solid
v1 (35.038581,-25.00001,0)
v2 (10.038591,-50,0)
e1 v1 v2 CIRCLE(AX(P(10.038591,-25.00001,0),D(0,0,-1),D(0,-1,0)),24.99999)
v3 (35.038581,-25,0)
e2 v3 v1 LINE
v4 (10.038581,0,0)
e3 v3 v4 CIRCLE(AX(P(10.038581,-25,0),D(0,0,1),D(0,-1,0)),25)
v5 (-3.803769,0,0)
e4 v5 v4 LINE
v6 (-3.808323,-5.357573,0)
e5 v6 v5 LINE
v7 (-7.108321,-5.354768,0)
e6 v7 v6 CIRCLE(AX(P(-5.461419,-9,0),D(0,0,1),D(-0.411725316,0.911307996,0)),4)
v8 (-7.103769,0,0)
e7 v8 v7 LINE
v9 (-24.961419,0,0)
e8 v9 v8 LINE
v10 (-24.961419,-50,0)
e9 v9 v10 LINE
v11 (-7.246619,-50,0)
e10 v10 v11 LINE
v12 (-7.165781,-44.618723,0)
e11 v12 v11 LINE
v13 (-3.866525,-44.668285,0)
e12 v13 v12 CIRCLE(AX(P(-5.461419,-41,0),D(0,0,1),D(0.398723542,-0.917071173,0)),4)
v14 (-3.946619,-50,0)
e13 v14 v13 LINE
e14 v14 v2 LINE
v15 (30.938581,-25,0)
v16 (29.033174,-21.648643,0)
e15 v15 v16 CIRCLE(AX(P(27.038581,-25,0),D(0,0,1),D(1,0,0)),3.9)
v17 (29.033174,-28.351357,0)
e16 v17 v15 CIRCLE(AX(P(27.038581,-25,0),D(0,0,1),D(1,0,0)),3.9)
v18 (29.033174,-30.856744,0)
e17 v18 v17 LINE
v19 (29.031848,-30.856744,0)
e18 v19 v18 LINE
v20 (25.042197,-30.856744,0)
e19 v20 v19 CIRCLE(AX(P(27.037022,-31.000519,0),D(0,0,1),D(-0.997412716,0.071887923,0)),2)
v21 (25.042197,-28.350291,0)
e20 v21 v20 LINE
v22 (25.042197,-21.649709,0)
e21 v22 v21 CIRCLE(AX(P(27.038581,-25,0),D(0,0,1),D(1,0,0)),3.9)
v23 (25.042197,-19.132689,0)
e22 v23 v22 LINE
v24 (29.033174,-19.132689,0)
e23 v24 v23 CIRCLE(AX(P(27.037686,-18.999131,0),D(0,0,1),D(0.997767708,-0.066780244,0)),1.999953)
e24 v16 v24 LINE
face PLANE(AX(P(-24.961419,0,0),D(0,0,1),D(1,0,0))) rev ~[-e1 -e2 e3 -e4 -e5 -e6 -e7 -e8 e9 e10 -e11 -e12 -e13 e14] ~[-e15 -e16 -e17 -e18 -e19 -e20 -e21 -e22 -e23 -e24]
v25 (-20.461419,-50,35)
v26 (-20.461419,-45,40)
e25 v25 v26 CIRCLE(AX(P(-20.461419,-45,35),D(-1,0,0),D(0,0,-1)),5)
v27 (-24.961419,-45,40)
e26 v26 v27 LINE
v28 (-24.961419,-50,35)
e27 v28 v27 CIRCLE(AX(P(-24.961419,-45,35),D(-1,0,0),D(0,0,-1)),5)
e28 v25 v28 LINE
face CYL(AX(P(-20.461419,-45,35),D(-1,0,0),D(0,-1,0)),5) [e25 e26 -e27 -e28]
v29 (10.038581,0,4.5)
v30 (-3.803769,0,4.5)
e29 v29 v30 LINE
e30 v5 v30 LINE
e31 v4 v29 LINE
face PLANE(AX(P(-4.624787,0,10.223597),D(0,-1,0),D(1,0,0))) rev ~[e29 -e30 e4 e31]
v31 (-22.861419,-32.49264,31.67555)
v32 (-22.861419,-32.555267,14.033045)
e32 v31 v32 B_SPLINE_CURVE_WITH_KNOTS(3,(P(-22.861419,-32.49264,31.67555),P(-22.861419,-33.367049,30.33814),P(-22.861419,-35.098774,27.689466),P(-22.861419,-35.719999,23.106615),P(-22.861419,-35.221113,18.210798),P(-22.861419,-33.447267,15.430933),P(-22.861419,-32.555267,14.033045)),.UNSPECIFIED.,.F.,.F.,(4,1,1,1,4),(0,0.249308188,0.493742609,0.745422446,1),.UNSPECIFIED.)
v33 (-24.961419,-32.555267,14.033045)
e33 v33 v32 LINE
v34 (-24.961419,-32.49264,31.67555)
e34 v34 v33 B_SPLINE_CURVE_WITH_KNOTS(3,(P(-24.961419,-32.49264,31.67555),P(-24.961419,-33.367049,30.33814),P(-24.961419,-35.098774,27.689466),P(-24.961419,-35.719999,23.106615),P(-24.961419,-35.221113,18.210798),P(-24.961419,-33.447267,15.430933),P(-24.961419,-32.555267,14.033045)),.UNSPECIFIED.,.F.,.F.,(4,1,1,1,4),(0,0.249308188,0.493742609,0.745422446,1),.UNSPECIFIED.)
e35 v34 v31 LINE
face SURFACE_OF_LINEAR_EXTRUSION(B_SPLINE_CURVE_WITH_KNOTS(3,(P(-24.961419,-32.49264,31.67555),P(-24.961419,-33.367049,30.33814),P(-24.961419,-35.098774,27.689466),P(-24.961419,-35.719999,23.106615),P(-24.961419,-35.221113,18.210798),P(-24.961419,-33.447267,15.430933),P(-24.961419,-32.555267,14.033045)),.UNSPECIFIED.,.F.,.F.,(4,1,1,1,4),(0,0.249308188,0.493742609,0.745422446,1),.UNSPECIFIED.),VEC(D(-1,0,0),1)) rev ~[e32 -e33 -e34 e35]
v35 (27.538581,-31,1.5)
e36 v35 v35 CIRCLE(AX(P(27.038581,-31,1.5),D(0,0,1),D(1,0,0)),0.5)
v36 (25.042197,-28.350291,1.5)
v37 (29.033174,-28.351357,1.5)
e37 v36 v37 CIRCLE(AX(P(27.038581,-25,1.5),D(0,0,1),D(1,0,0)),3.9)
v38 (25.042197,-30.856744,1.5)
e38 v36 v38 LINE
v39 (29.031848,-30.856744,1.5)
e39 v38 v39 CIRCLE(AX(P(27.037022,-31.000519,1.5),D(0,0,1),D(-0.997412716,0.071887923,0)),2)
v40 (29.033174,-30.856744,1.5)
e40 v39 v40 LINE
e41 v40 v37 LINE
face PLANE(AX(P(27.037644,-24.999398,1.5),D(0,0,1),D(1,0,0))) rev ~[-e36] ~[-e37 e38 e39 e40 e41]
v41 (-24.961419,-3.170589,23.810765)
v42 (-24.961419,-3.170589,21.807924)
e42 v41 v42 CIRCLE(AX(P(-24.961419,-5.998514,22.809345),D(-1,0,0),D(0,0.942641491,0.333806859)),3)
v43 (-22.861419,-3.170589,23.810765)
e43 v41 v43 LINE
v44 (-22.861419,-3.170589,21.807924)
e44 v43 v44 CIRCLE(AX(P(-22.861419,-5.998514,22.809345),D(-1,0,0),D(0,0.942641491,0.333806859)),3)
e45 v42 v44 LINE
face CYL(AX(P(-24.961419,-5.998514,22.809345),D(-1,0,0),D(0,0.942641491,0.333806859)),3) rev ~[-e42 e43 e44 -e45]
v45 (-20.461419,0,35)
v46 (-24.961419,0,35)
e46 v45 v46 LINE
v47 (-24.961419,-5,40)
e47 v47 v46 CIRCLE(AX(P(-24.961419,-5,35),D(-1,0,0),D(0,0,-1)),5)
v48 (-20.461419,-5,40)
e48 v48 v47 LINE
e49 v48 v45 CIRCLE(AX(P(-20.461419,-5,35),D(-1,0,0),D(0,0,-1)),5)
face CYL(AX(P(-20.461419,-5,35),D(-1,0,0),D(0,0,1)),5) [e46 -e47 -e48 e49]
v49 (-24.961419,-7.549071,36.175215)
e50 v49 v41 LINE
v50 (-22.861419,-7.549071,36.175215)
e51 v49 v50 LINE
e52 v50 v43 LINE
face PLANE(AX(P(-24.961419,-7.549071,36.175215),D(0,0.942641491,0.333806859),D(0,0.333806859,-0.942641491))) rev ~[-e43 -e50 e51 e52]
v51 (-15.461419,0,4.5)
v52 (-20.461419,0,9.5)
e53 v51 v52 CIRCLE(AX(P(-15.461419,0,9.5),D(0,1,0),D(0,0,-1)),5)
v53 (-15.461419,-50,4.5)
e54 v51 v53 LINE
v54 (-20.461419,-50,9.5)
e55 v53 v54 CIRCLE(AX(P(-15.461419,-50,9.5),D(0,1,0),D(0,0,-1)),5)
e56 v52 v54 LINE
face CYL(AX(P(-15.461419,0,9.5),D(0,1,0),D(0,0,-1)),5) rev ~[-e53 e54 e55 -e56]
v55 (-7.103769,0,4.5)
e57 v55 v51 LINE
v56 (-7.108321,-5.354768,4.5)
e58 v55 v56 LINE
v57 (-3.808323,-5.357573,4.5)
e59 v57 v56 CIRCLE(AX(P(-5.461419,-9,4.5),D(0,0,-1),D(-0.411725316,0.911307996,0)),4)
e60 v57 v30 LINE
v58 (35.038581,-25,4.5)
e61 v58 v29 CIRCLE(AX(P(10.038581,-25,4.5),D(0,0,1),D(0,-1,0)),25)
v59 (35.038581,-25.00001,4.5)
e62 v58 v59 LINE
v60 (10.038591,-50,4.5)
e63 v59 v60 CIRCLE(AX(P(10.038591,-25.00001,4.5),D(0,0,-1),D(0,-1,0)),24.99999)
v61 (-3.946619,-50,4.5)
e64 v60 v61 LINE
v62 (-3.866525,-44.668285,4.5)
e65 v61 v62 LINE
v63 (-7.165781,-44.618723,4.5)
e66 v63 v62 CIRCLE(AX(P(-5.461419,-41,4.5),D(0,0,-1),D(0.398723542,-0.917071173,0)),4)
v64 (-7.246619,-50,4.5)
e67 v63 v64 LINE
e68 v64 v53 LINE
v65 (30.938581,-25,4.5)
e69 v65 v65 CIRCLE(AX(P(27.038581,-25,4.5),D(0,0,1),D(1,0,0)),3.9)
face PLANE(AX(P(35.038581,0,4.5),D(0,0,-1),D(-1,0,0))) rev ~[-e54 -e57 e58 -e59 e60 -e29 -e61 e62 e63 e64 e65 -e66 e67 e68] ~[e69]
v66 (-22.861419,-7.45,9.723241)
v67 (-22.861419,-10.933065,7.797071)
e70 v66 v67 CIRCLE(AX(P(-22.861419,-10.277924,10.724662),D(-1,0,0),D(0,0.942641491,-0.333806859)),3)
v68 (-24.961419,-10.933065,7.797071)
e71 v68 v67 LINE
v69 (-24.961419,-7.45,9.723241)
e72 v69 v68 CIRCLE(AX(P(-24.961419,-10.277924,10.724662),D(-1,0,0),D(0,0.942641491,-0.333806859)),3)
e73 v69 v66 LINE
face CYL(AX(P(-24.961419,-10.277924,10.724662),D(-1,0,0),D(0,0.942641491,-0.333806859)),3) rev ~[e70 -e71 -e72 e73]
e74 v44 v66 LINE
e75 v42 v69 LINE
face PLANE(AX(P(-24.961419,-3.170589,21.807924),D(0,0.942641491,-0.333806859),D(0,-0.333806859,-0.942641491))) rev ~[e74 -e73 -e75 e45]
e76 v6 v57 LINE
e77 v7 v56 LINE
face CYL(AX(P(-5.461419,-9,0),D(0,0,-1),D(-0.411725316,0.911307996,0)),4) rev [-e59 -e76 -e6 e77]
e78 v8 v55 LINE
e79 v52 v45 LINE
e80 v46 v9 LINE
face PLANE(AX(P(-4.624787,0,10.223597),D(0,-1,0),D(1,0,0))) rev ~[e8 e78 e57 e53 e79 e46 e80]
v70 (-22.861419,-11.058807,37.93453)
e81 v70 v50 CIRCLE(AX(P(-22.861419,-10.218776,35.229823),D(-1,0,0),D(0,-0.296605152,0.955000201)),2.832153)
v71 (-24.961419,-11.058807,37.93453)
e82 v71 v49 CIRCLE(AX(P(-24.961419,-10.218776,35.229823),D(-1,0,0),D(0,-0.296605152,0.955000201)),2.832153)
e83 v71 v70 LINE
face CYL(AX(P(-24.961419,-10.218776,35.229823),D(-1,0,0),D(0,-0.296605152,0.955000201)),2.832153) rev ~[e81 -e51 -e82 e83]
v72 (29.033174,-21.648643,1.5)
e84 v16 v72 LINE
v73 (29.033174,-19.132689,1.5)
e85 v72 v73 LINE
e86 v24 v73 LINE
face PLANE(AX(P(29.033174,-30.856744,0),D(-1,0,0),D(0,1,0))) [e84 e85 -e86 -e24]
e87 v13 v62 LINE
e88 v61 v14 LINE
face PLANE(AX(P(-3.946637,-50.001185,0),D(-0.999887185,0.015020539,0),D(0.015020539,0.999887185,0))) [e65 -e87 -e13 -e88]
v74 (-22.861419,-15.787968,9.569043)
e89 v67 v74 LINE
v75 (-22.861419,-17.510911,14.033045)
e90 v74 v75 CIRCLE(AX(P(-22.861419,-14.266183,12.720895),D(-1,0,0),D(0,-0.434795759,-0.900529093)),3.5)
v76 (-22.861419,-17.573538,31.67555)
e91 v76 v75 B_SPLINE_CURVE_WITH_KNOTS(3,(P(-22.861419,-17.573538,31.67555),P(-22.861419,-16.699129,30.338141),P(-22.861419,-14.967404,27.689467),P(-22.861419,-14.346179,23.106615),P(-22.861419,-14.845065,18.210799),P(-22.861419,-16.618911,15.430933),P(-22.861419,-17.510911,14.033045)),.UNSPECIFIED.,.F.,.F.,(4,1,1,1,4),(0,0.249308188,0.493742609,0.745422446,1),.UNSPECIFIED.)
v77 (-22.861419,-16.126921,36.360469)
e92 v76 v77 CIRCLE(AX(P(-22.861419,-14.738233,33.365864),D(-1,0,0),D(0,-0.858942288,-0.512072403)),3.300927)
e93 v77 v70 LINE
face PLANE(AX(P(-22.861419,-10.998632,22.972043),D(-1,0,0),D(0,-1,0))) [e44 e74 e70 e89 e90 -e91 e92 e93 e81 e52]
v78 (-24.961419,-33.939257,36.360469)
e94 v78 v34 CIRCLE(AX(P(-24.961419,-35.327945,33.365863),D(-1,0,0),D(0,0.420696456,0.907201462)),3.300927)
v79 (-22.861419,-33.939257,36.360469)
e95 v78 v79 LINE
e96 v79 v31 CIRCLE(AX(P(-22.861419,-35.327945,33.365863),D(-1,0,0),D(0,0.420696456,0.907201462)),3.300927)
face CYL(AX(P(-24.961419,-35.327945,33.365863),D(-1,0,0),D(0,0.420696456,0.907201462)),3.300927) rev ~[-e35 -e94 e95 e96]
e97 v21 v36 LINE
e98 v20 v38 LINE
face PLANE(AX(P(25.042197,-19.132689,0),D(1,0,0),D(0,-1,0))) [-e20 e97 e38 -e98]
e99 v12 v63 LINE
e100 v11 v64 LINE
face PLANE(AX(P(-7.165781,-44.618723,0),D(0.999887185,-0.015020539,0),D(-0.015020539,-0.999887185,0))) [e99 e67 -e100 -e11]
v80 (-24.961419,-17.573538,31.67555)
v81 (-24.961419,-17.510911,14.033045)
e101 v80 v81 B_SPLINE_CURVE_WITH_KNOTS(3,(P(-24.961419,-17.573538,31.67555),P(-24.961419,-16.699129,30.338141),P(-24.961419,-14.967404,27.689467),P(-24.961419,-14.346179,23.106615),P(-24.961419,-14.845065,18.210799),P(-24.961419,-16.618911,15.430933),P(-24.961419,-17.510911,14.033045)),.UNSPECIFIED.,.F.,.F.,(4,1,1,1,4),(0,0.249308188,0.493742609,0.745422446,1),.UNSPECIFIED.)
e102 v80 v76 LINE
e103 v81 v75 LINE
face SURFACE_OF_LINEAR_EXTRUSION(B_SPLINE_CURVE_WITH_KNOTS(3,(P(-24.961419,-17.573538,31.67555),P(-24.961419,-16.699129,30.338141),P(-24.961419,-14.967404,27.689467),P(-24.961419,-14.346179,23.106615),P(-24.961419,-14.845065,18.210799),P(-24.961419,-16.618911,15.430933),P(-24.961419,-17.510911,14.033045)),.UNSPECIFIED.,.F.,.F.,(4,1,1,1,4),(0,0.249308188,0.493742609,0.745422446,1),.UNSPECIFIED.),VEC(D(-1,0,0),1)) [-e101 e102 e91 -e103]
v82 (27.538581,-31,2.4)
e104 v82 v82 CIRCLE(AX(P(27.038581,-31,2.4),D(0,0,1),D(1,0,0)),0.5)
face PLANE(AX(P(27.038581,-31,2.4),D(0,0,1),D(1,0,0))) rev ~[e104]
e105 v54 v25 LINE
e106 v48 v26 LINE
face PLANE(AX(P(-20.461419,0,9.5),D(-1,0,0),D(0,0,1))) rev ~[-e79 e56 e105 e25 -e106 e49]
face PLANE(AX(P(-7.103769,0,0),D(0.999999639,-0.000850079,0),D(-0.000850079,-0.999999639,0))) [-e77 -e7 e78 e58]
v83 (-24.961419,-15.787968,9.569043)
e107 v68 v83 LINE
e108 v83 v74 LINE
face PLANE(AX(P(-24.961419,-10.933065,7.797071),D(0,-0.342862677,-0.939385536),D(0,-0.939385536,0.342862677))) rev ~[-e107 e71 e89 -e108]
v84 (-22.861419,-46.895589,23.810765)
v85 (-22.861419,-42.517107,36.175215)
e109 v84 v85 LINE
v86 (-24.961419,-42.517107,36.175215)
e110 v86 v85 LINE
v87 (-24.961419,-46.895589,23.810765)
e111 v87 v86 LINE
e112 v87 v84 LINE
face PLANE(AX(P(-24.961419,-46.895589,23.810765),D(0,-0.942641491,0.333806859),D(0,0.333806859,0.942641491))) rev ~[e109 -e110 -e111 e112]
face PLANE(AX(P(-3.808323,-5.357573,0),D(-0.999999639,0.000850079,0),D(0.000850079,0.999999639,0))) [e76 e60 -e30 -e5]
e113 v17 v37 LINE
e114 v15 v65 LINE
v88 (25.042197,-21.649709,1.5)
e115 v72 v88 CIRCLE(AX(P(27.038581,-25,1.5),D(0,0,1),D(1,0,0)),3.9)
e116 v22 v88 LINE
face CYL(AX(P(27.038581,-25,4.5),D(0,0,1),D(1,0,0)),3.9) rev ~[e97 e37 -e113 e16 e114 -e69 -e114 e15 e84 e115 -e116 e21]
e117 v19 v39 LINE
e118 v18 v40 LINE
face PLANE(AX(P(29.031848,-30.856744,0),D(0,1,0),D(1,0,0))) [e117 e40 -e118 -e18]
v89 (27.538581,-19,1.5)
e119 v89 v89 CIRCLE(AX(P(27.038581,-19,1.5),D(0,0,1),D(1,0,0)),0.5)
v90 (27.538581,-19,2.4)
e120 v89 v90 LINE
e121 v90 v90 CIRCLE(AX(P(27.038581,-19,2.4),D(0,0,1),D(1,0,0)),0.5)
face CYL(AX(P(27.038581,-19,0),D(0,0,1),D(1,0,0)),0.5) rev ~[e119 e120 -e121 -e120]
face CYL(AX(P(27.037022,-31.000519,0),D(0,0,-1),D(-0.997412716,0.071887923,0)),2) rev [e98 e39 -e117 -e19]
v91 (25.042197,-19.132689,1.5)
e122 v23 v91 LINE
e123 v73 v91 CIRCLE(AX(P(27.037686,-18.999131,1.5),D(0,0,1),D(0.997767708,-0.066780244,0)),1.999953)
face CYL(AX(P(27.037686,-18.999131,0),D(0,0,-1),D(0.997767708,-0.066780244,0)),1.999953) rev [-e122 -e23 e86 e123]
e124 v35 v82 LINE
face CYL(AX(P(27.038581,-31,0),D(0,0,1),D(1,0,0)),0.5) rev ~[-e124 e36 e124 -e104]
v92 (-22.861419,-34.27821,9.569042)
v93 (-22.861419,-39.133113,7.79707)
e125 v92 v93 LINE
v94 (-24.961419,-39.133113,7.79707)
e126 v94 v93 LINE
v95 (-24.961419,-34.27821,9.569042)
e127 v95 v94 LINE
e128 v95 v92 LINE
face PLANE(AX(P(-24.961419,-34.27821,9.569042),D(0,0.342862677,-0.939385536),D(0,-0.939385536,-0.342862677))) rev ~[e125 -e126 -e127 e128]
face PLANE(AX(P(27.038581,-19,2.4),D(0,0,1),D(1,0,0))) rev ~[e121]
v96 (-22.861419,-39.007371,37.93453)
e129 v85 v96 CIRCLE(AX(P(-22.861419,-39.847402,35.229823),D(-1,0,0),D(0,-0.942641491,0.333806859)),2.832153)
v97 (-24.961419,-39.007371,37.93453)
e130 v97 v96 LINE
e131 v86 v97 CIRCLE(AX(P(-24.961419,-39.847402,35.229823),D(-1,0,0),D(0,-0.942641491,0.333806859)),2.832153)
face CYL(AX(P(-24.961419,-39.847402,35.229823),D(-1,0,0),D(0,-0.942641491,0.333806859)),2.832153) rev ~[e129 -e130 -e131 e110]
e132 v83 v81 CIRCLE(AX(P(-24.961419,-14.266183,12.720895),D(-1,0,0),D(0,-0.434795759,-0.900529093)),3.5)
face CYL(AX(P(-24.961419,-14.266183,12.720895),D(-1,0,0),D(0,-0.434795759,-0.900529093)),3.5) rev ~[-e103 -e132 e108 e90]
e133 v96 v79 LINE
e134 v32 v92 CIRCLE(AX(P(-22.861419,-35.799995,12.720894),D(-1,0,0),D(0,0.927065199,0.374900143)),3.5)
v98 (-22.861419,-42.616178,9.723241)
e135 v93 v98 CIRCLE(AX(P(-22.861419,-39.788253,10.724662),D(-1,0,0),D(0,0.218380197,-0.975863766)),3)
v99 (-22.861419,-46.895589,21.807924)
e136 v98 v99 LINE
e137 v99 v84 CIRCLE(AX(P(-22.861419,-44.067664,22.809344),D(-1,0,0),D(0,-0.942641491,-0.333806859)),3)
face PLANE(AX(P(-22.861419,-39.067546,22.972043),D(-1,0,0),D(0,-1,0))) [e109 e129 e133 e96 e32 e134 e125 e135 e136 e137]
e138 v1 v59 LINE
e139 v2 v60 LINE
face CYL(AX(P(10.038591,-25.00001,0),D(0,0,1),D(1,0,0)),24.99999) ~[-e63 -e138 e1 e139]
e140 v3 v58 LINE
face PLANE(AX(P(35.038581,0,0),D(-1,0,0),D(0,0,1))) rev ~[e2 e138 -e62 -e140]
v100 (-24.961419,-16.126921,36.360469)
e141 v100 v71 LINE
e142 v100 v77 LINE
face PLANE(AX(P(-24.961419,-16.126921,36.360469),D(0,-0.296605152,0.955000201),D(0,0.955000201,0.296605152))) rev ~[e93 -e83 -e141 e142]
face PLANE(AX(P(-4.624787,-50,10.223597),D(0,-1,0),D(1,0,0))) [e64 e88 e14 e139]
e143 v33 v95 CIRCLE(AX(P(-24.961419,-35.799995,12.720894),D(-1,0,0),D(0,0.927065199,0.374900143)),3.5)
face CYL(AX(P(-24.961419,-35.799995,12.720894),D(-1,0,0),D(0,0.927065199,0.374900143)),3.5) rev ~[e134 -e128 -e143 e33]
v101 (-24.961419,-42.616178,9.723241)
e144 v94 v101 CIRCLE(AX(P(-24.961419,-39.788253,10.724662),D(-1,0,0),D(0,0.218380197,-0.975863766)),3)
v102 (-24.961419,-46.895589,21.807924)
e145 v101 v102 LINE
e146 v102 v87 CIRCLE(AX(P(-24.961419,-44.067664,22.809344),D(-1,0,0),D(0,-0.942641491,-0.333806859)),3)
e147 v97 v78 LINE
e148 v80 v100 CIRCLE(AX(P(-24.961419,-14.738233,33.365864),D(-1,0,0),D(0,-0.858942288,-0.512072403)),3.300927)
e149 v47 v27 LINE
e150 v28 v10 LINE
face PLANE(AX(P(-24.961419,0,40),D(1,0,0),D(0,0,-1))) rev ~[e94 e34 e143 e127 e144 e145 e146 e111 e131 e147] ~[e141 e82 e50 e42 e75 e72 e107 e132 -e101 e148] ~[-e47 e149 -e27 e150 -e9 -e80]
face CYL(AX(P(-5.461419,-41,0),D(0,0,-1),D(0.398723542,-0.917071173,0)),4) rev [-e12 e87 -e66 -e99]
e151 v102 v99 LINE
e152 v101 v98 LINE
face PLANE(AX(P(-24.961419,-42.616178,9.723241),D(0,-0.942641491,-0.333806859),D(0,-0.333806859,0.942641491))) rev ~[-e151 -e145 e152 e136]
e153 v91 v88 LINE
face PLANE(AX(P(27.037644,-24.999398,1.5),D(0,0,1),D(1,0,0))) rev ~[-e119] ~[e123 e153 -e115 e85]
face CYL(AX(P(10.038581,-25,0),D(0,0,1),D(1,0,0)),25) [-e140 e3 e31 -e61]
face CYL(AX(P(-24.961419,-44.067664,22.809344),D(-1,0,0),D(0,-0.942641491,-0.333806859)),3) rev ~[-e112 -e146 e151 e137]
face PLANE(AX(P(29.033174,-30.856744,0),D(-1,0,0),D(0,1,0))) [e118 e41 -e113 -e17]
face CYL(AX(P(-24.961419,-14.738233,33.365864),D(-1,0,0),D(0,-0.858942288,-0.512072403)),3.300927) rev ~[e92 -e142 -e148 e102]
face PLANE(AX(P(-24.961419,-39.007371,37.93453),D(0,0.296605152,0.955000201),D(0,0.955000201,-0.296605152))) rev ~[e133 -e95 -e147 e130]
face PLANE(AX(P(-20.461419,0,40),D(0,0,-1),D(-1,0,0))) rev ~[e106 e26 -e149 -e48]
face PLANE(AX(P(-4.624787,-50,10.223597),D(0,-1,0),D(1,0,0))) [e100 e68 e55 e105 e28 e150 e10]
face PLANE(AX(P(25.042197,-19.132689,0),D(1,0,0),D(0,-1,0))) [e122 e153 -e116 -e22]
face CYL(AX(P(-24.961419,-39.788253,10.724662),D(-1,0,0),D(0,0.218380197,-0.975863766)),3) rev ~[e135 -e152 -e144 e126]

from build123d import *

# Parameters (mm, degrees)
F1_DEPTH  = 50
F2_R      = 25
F3_R      = 24.99999
F4_R      = 3.9
F5_DEPTH  = 12.5
F7_R      = 0.5
F8_DEPTH  = 2.4
F6_R      = 0.5
F9_DEPTH  = 2.4
F11_DEPTH = 1.5
F12_R     = 5
F13_R     = 5
F15_DEPTH = 2.1
F17_DEPTH = 25
F18_DEPTH = 25


# Not quite as in the source:
# - a fillet or chamfer is up to 0.001 mm smaller than in the source, because OpenCascade refuses the exact size
# - ends of sketch curves that miss each other by under 0.0002 mm in the source are joined


with BuildPart() as f1:
    # F0 (on Front) → F1 (new body)
    with BuildSketch(Plane.XZ):
        with BuildLine():
            Line((-24.9614193552, 0), (35.0385806448, 0))
            Line((35.0385806448, 0), (35.0385806448, 4.5))
            Line((35.0385806448, 4.5), (-15.4614193552, 4.5))
            ThreePointArc((-15.4614193552, 4.5), (-18.9969532612, 5.9644660941), (-20.4614193552, 9.5))
            Line((-20.4614193552, 9.5), (-20.4614193552, 40))
            Line((-20.4614193552, 40), (-24.9614193552, 40))
            Line((-24.9614193552, 40), (-24.9614193552, 0))
        make_face()
    extrude(amount=F1_DEPTH)

    # F2
    f2_edges = [f1.edges().sort_by_distance(p)[0] for p in [
        (35.038581, 0, 2.25),
    ]]
    fillet(f2_edges, radius=F2_R)

    # F3 (radius 25 in the source; OpenCascade refuses exactly that, so slightly less here)
    f3_edges = [f1.edges().sort_by_distance(p)[0] for p in [
        (35.038581, -50, 2.25),
    ]]
    fillet(f3_edges, radius=F3_R)

    # F4 (on face) → F5 (cut, symmetric)
    with BuildSketch(Plane.XY.offset(4.5)):
        with Locations((27.0385806448, -25)):
            Circle(F4_R)
    extrude(amount=F5_DEPTH, both=True, mode=Mode.SUBTRACT)

    # F7 (on Top) → F8 (cut, symmetric)
    with BuildSketch(Plane.XY):
        with Locations((27.0385806448, -19)):
            Circle(F7_R)
    extrude(amount=F8_DEPTH, both=True, mode=Mode.SUBTRACT)

    # F6 (on Top) → F9 (cut, symmetric)
    with BuildSketch(Plane.XY):
        with Locations((27.0385806448, -31)):
            Circle(F6_R)
    extrude(amount=F9_DEPTH, both=True, mode=Mode.SUBTRACT)

    # F10 (on Top) → F11 (cut)
    with BuildSketch(Plane.XY):
        with BuildLine():
            Line((25.0421970529, -19.1326886576), (25.0421970529, -30.8567436225))
            ThreePointArc((25.0421970529, -30.8567436225), (27.0370224854, -33.0005194676), (29.031847918, -30.8567436225))
            Line((29.031847918, -30.8567436225), (29.0331744321, -30.8567436225))
            Line((29.0331744321, -30.8567436225), (29.0331744321, -19.1326886576))
            ThreePointArc((29.0331744321, -19.1326886576), (27.0376323306, -16.9991781279), (25.0421970529, -19.1326886576))
        make_face()
    extrude(amount=F11_DEPTH, mode=Mode.SUBTRACT)

    # F12
    f12_edges = [f1.edges().sort_by_distance(p)[0] for p in [
        (-22.711419, -50, 40),
    ]]
    fillet(f12_edges, radius=F12_R)

    # F13
    f13_edges = [f1.edges().sort_by_distance(p)[0] for p in [
        (-22.711419, 0, 40),
    ]]
    fillet(f13_edges, radius=F13_R)

    # F14 (on face) → F15 (cut)
    with BuildSketch(Plane(origin=(-24.9614193552, 0, 0), x_dir=(0, -1, 0), z_dir=(-1, 0, 0))):
        with BuildLine():
            Line((46.8955885446, 23.8107649305), (42.5171071131, 36.1752150642))
            ThreePointArc((42.5171071131, 36.1752150642), (41.1165449237, 37.7616933331), (39.0073708388, 37.93452974))
            Line((39.0073708388, 37.93452974), (33.9392572641, 36.3604687154))
            ThreePointArc((33.9392572641, 36.3604687154), (32.1739564338, 34.3397574907), (32.4926399743, 31.675549977))
            add(Edge.make_bspline(
                [(32.4926399743, 31.675549977), (33.3670492771, 30.3381403961), (35.0987739091, 27.6894664778), (35.7199990478, 23.1066149427), (35.2211127015, 18.2107984297), (33.4472667585, 15.4309330693), (32.5552672148, 14.0330446884)],
                knots=[0, 0, 0, 0, 0.2493081883, 0.4937426091, 0.7454224458, 1, 1, 1, 1], degree=3))
            ThreePointArc((32.5552672148, 14.0330446884), (32.5347631708, 11.4606329376), (34.2782102525, 9.5690423623))
            Line((34.2782102525, 9.5690423623), (39.1331128776, 7.7970703132))
            ThreePointArc((39.1331128776, 7.7970703132), (41.2400733133, 8.0993579825), (42.6161779425, 9.723241033))
            Line((42.6161779425, 9.723241033), (46.8955885446, 21.8079237751))
            ThreePointArc((46.8955885446, 21.8079237751), (47.0676640713, 22.8093443528), (46.8955885446, 23.8107649305))
        make_face()
        with BuildLine():
            ThreePointArc((3.1705893979, 23.8107653384), (2.9985138712, 22.8093447607), (3.1705893979, 21.807924183))
            Line((3.1705893979, 21.807924183), (7.45, 9.723241441))
            ThreePointArc((7.45, 9.723241441), (8.8261046292, 8.0993583904), (10.9330650649, 7.7970707212))
            Line((10.9330650649, 7.7970707212), (15.78796769, 9.5690427702))
            ThreePointArc((15.78796769, 9.5690427702), (17.5314147718, 11.4606333455), (17.5109107277, 14.0330450963))
            add(Edge.make_bspline(
                [(17.5735379682, 31.6755503849), (16.6991286655, 30.3381408041), (14.9674040335, 27.6894668857), (14.3461788947, 23.1066153507), (14.8450652411, 18.2107988376), (16.618911184, 15.4309334772), (17.5109107277, 14.0330450963)],
                knots=[0, 0, 0, 0, 0.2493081883, 0.4937426091, 0.7454224458, 1, 1, 1, 1], degree=3))
            ThreePointArc((17.5735379682, 31.6755503849), (17.8922215087, 34.3397578986), (16.1269206784, 36.3604691233))
            Line((16.1269206784, 36.3604691233), (11.0588071037, 37.9345301479))
            ThreePointArc((11.0588071037, 37.9345301479), (8.9496330188, 37.7616937411), (7.5490708294, 36.1752154721))
            Line((7.5490708294, 36.1752154721), (3.1705893979, 23.8107653384))
        make_face()
    extrude(amount=-F15_DEPTH, mode=Mode.SUBTRACT)

    # F16 (on Top) → F17 (cut)
    with BuildSketch(Plane.XY):
        with BuildLine():
            Line((-7.103768643, 0), (-7.1083206196, -5.3547680149))
            ThreePointArc((-7.1083206196, -5.3547680149), (-5.4648196706, -12.9999985547), (-3.8083230043, -5.357573274))
            Line((-3.8083230043, -5.357573274), (-3.803768643, 0))
            Line((-3.803768643, 0), (-7.103768643, 0))
        make_face()
        with BuildLine():
            Line((-3.9466372691, -50.0011853874), (-3.8665251866, -44.6682846933))
            ThreePointArc((-3.8665251866, -44.6682846933), (-5.4013371978, -37.0004512587), (-7.1657806518, -44.6187225054))
            Line((-7.1657806518, -44.6187225054), (-7.2466372691, -50.0011853874))
            Line((-7.2466372691, -50.0011853874), (-3.9466372691, -50.0011853874))
        make_face()
    extrude(amount=F17_DEPTH, mode=Mode.SUBTRACT)

    # F16 (on Top) → F18 (cut)
    with BuildSketch(Plane.XY):
        with BuildLine():
            Line((-7.103768643, 0), (-7.1083206196, -5.3547680149))
            ThreePointArc((-7.1083206196, -5.3547680149), (-5.4648196706, -12.9999985547), (-3.8083230043, -5.357573274))
            Line((-3.8083230043, -5.357573274), (-3.803768643, 0))
            Line((-3.803768643, 0), (-7.103768643, 0))
        make_face()
        with BuildLine():
            Line((-3.9466372691, -50.0011853874), (-3.8665251866, -44.6682846933))
            ThreePointArc((-3.8665251866, -44.6682846933), (-5.4013371978, -37.0004512587), (-7.1657806518, -44.6187225054))
            Line((-7.1657806518, -44.6187225054), (-7.2466372691, -50.0011853874))
            Line((-7.2466372691, -50.0011853874), (-3.9466372691, -50.0011853874))
        make_face()
    extrude(amount=F18_DEPTH, mode=Mode.SUBTRACT)


solid = f1.part
